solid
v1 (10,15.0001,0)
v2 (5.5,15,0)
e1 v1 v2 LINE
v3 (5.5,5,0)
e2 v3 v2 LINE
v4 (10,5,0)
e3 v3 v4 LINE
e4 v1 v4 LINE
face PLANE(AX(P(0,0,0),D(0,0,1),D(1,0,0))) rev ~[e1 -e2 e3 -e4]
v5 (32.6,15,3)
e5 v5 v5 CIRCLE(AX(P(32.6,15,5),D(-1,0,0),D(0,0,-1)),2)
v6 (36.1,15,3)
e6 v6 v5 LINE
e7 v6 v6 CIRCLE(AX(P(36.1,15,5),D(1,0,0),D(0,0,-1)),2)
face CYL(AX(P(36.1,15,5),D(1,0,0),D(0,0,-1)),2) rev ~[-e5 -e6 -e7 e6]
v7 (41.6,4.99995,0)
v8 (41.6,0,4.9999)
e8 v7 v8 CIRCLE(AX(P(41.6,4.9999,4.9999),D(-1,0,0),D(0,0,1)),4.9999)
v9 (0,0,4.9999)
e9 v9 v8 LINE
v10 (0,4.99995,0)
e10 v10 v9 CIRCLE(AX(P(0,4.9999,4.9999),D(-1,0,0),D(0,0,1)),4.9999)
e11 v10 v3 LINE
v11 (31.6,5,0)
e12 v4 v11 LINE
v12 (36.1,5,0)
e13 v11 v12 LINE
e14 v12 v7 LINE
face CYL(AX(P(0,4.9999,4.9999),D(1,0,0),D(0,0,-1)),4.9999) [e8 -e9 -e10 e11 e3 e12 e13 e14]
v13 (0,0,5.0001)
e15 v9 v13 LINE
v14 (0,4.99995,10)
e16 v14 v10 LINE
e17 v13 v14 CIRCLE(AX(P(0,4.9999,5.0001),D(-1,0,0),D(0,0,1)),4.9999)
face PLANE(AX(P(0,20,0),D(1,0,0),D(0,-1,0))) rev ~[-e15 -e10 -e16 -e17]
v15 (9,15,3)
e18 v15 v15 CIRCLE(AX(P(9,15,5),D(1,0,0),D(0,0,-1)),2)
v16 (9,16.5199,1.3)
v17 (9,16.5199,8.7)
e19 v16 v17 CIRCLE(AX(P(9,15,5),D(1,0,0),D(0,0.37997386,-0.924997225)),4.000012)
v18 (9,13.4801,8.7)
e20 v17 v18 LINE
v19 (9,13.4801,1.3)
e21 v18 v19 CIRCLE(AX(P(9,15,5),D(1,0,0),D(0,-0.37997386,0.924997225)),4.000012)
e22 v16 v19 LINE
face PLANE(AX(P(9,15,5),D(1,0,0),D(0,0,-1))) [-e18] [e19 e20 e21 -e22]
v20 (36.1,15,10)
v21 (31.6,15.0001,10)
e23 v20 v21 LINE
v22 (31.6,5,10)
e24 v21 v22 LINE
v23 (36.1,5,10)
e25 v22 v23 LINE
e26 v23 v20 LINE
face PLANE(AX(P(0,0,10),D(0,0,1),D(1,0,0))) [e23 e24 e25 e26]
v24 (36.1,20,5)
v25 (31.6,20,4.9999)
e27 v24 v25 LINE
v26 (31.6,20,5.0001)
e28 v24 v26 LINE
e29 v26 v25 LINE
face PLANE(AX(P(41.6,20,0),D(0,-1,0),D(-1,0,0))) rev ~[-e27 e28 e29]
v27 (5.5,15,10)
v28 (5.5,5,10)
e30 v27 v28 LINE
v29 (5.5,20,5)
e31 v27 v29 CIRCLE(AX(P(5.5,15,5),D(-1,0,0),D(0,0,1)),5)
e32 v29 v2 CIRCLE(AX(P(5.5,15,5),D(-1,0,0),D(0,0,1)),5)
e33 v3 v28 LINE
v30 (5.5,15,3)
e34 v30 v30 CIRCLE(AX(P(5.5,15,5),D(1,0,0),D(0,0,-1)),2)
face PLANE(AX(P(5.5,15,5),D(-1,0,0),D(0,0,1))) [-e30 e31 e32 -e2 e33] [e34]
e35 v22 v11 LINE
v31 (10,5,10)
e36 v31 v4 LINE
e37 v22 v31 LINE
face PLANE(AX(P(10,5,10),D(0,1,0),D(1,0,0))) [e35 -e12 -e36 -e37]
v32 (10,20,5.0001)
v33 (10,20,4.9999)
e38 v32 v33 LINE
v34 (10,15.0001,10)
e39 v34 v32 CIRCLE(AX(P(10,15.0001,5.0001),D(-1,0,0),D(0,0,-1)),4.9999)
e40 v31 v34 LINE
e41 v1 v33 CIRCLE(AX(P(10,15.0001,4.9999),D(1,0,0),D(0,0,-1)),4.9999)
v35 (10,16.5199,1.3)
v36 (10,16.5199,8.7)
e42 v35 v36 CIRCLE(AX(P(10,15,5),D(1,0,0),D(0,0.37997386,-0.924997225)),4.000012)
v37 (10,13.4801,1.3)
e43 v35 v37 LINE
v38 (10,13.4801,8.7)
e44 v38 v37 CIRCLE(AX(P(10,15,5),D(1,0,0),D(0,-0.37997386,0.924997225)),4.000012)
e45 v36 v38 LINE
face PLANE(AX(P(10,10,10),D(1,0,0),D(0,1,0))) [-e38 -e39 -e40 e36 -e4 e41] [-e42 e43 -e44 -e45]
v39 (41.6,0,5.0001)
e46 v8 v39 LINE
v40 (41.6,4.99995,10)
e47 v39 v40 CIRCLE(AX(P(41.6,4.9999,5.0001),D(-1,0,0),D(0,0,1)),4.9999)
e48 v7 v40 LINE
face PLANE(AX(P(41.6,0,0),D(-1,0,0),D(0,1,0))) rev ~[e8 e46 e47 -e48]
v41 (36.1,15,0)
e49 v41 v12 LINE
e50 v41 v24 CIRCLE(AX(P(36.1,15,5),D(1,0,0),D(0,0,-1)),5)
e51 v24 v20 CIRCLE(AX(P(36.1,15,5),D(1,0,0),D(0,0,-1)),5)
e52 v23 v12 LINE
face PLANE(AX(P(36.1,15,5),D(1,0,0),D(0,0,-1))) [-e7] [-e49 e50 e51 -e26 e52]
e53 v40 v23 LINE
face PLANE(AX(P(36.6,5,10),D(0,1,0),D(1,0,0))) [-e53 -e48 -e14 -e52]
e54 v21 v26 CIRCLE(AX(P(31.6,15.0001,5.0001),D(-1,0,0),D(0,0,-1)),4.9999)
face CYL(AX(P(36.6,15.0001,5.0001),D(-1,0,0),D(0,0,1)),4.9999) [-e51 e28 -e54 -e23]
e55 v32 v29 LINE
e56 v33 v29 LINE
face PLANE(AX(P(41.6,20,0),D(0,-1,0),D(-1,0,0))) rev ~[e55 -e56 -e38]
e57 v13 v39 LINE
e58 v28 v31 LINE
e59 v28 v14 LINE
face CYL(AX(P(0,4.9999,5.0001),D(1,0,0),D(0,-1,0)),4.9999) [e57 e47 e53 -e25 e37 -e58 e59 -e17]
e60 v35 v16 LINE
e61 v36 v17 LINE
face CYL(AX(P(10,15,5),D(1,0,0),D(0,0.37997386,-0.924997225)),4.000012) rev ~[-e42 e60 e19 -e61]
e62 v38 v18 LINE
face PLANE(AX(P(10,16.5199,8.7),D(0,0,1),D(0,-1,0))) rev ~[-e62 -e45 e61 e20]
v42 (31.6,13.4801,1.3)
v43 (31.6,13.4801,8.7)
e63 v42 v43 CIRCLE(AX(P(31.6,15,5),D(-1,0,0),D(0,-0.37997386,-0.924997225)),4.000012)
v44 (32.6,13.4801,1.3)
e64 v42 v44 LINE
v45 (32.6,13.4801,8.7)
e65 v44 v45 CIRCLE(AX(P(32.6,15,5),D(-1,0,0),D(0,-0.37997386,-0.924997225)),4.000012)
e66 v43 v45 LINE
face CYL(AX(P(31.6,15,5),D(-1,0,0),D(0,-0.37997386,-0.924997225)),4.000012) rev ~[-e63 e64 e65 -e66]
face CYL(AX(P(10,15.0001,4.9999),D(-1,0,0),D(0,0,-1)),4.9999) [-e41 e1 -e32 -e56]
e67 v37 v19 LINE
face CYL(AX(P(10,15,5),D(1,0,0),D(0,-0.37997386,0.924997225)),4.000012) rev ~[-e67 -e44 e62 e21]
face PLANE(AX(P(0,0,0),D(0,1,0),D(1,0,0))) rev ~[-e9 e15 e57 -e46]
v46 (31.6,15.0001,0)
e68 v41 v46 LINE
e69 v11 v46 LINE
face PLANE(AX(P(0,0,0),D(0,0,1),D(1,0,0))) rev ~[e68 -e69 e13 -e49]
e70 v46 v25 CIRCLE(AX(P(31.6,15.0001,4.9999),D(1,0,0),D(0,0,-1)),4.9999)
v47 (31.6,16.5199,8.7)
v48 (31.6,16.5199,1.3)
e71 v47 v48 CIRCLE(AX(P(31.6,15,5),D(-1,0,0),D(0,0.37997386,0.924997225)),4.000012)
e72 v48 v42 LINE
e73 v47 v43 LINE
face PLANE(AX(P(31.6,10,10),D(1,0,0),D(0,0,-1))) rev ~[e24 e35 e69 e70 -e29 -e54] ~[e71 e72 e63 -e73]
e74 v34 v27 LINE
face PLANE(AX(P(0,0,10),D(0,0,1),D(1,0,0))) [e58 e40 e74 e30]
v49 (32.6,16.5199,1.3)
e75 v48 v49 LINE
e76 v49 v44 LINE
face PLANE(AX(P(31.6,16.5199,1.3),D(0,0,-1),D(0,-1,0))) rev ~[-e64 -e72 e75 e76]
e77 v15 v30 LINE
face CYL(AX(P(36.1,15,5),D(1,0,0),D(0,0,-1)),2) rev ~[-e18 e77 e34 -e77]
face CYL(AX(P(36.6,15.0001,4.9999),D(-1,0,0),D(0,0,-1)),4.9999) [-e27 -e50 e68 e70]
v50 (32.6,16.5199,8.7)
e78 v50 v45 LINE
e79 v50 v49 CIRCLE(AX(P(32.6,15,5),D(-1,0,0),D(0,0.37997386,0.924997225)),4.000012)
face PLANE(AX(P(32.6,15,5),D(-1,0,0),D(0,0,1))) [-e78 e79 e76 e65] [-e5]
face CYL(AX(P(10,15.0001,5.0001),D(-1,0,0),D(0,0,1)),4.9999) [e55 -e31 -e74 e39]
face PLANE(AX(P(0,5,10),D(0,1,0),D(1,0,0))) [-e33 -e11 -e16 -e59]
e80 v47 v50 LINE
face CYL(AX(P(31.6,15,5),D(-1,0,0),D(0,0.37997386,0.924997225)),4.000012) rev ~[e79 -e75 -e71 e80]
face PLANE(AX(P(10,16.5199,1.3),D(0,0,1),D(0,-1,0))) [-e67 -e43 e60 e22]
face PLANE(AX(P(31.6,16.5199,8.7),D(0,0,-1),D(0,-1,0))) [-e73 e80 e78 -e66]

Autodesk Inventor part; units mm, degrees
ref_plane "YZ Plane" through (0, 0, 0) normal (1, 0, 0) x (0, 1, 0)
ref_plane "XZ Plane" through (0, 0, 0) normal (0, 1, 0) x (-1, 0, 0)
ref_plane "XY Plane" through (0, 0, 0) normal (0, 0, 1) x (1, 0, 0)
sketch "Sketch1" plane through (0, 0, 0) normal (0, 0, 1) x (1, 0, 0)
  line L0 (0, 0) -> (41.6, 0)
  line L1 (41.6, 0) -> (41.6, 20)
  line L2 (41.6, 20) -> (0, 20)
  line L3 (0, 20) -> (0, 0)
  dimension "d0" = 41.6
  dimension "d1" = 20
extrude "Extrusion1" add sketch "Sketch1" along normal blind 10
sketch "Sketch3" plane through (0, 0, 10) normal (0, 0, 1) x (1, 0, 0)
  line L0 (0, 20) -> (5, 20)
  line L1 (5, 20) -> (5, 10)
  line L2 (5, 10) -> (0, 10)
  line L3 (0, 10) -> (0, 20)
  line L4 (41.6, 20) -> (36.6, 20)
  line L5 (36.6, 20) -> (36.6, 10)
  line L6 (36.6, 10) -> (41.6, 10)
  line L7 (41.6, 10) -> (41.6, 20)
  dimension "d7" = 5
  dimension "d8" = 5
  dimension "d9" = 10
extrude "Extrusion2" cut sketch "Sketch3" against normal through all
sketch "Sketch4" plane through (0, 0, 10) normal (0, 0, 1) x (1, 0, 0)
  line L0 (36.6, 20) -> (5, 20) projected
  line L1 (5, 20) -> (5, 10) projected
  line L2 (10, 20) -> (31.6, 20)
  line L3 (31.6, 20) -> (31.6, 10)
  line L4 (31.6, 10) -> (10, 10)
  line L5 (10, 10) -> (10, 20)
  dimension "d12" = 21.6
  dimension "d13" = 10
  dimension "d14" = 5
extrude "Extrusion3" cut sketch "Sketch4" against normal through all
fillet "Fillet1" radius 5 6 edges at (20.8, 0, 0) (20.8, 0, 10) (34.1, 20, 10) (34.1, 20, 0) (7.5, 20, 0) (7.5, 20, 10)
sketch "Sketch5" plane through (10, 10, 10) normal (0, 1, 0) x (1, 0, 0)
  line L0 (0, 10) -> (21.6, 10) projected
  line L1 (0, 0) -> (0, 10) projected
  line L2 (21.6, 0) -> (0, 0) projected
  line L3 (21.6, 0) -> (21.6, 10) projected
  point P0 (-10, 10)
extrude "Extrusion4" cut sketch "Sketch5" against normal blind 5
sketch "Sketch6" plane through (36.6, 10, 10) normal (0, 1, 0) x (1, 0, 0)
  line L0 (0, 10) -> (5, 10) projected
  line L1 (0, 0) -> (0, 10) projected
  line L2 (5, 0) -> (0, 0) projected
  line L3 (5, 10) -> (5, 0) projected
  point P0 (-36.6, 10)
extrude "Extrusion5" cut sketch "Sketch6" against normal blind 5
sketch "Sketch7" plane through (0, 10, 10) normal (0, 1, 0) x (1, 0, 0)
  line L0 (0, 10) -> (5, 10) projected
  line L1 (0, 0) -> (0, 10) projected
  line L2 (5, 0) -> (0, 0) projected
  line L3 (5, 0) -> (5, 10) projected
extrude "Extrusion6" cut sketch "Sketch7" against normal blind 5
sketch "Sketch8" plane through (5, 15, 5) normal (-1, 0, 0) x (0, 0, 1)
  arc A0 (5, 0) -> (-5, 0) centre (0, 0) ccw projected
  line L0 (-5, -10) -> (-5, 0) projected
  line L1 (-5, -10) -> (5, -10) projected
  line L2 (5, 0) -> (5, -10) projected
  point P0 (-5, -15)
extrude "Extrusion7" cut sketch "Sketch8" against normal blind 0.5
sketch "Sketch9" plane through (36.6, 15, 5) normal (1, 0, 0) x (0, 0, -1)
  arc A0 (5, 0) -> (-5, 0) centre (0, 0) ccw projected
  line L0 (-5, -10) -> (-5, 0) projected
  line L1 (-5, -10) -> (5, -10) projected
  line L2 (5, 0) -> (5, -10) projected
  point P0 (5, -15)
extrude "Extrusion8" cut sketch "Sketch9" against normal blind 0.5
sketch "Sketch10" plane through (36.1, 15, 5) normal (1, 0, 0) x (0, 0, -1)
  arc A0 (5, 0) -> (-5, 0) centre (0, 0) ccw projected
  circle A1 centre (0, 0) radius 2
  point P0 (5, -15)
  dimension "d28" = 4
extrude "Extrusion9" cut sketch "Sketch10" against normal through all
sketch "Sketch11" plane through (31.6, 15, 5) normal (-1, 0, 0) x (0, 0, 1)
  circle A0 centre (0, 0) radius 2 projected
  arc A1 (5, 0) -> (-5, 0) centre (0, 0) ccw projected
  line L0 (5, 0) -> (5, -10) projected
  line L1 (-3.7, 1.5199) -> (-3.7, -1.5199)
  line L2 (3.7, 1.5199) -> (3.7, -1.5199)
  arc A2 (-3.7, -1.5199) -> (3.7, -1.5199) centre (0, 0) ccw
  arc A3 (3.7, 1.5199) -> (-3.7, 1.5199) centre (0, 0) ccw
  point P0 (-5, -15)
  dimension "d33" = 3.7
extrude "Extrusion10" cut sketch "Sketch11" against normal blind 1
sketch "Sketch12" plane through (10, 15, 5) normal (1, 0, 0) x (0, 0, -1)
  circle A0 centre (0, 0) radius 2 projected
  arc A1 (5, 0) -> (-5, 0) centre (0, 0) ccw projected
  line L0 (5, 0) -> (5, -10) projected
  line L1 (3.7, 1.5199) -> (3.7, -1.5199)
  line L2 (-3.7, 1.5199) -> (-3.7, -1.5199)
  arc A2 (-3.7, -1.5199) -> (3.7, -1.5199) centre (0, 0) ccw
  arc A3 (3.7, 1.5199) -> (-3.7, 1.5199) centre (0, 0) ccw
  point P0 (5, -15)
  dimension "d37" = 3.7
extrude "Extrusion11" cut sketch "Sketch12" against normal blind 1
properties part number "Sliide"
